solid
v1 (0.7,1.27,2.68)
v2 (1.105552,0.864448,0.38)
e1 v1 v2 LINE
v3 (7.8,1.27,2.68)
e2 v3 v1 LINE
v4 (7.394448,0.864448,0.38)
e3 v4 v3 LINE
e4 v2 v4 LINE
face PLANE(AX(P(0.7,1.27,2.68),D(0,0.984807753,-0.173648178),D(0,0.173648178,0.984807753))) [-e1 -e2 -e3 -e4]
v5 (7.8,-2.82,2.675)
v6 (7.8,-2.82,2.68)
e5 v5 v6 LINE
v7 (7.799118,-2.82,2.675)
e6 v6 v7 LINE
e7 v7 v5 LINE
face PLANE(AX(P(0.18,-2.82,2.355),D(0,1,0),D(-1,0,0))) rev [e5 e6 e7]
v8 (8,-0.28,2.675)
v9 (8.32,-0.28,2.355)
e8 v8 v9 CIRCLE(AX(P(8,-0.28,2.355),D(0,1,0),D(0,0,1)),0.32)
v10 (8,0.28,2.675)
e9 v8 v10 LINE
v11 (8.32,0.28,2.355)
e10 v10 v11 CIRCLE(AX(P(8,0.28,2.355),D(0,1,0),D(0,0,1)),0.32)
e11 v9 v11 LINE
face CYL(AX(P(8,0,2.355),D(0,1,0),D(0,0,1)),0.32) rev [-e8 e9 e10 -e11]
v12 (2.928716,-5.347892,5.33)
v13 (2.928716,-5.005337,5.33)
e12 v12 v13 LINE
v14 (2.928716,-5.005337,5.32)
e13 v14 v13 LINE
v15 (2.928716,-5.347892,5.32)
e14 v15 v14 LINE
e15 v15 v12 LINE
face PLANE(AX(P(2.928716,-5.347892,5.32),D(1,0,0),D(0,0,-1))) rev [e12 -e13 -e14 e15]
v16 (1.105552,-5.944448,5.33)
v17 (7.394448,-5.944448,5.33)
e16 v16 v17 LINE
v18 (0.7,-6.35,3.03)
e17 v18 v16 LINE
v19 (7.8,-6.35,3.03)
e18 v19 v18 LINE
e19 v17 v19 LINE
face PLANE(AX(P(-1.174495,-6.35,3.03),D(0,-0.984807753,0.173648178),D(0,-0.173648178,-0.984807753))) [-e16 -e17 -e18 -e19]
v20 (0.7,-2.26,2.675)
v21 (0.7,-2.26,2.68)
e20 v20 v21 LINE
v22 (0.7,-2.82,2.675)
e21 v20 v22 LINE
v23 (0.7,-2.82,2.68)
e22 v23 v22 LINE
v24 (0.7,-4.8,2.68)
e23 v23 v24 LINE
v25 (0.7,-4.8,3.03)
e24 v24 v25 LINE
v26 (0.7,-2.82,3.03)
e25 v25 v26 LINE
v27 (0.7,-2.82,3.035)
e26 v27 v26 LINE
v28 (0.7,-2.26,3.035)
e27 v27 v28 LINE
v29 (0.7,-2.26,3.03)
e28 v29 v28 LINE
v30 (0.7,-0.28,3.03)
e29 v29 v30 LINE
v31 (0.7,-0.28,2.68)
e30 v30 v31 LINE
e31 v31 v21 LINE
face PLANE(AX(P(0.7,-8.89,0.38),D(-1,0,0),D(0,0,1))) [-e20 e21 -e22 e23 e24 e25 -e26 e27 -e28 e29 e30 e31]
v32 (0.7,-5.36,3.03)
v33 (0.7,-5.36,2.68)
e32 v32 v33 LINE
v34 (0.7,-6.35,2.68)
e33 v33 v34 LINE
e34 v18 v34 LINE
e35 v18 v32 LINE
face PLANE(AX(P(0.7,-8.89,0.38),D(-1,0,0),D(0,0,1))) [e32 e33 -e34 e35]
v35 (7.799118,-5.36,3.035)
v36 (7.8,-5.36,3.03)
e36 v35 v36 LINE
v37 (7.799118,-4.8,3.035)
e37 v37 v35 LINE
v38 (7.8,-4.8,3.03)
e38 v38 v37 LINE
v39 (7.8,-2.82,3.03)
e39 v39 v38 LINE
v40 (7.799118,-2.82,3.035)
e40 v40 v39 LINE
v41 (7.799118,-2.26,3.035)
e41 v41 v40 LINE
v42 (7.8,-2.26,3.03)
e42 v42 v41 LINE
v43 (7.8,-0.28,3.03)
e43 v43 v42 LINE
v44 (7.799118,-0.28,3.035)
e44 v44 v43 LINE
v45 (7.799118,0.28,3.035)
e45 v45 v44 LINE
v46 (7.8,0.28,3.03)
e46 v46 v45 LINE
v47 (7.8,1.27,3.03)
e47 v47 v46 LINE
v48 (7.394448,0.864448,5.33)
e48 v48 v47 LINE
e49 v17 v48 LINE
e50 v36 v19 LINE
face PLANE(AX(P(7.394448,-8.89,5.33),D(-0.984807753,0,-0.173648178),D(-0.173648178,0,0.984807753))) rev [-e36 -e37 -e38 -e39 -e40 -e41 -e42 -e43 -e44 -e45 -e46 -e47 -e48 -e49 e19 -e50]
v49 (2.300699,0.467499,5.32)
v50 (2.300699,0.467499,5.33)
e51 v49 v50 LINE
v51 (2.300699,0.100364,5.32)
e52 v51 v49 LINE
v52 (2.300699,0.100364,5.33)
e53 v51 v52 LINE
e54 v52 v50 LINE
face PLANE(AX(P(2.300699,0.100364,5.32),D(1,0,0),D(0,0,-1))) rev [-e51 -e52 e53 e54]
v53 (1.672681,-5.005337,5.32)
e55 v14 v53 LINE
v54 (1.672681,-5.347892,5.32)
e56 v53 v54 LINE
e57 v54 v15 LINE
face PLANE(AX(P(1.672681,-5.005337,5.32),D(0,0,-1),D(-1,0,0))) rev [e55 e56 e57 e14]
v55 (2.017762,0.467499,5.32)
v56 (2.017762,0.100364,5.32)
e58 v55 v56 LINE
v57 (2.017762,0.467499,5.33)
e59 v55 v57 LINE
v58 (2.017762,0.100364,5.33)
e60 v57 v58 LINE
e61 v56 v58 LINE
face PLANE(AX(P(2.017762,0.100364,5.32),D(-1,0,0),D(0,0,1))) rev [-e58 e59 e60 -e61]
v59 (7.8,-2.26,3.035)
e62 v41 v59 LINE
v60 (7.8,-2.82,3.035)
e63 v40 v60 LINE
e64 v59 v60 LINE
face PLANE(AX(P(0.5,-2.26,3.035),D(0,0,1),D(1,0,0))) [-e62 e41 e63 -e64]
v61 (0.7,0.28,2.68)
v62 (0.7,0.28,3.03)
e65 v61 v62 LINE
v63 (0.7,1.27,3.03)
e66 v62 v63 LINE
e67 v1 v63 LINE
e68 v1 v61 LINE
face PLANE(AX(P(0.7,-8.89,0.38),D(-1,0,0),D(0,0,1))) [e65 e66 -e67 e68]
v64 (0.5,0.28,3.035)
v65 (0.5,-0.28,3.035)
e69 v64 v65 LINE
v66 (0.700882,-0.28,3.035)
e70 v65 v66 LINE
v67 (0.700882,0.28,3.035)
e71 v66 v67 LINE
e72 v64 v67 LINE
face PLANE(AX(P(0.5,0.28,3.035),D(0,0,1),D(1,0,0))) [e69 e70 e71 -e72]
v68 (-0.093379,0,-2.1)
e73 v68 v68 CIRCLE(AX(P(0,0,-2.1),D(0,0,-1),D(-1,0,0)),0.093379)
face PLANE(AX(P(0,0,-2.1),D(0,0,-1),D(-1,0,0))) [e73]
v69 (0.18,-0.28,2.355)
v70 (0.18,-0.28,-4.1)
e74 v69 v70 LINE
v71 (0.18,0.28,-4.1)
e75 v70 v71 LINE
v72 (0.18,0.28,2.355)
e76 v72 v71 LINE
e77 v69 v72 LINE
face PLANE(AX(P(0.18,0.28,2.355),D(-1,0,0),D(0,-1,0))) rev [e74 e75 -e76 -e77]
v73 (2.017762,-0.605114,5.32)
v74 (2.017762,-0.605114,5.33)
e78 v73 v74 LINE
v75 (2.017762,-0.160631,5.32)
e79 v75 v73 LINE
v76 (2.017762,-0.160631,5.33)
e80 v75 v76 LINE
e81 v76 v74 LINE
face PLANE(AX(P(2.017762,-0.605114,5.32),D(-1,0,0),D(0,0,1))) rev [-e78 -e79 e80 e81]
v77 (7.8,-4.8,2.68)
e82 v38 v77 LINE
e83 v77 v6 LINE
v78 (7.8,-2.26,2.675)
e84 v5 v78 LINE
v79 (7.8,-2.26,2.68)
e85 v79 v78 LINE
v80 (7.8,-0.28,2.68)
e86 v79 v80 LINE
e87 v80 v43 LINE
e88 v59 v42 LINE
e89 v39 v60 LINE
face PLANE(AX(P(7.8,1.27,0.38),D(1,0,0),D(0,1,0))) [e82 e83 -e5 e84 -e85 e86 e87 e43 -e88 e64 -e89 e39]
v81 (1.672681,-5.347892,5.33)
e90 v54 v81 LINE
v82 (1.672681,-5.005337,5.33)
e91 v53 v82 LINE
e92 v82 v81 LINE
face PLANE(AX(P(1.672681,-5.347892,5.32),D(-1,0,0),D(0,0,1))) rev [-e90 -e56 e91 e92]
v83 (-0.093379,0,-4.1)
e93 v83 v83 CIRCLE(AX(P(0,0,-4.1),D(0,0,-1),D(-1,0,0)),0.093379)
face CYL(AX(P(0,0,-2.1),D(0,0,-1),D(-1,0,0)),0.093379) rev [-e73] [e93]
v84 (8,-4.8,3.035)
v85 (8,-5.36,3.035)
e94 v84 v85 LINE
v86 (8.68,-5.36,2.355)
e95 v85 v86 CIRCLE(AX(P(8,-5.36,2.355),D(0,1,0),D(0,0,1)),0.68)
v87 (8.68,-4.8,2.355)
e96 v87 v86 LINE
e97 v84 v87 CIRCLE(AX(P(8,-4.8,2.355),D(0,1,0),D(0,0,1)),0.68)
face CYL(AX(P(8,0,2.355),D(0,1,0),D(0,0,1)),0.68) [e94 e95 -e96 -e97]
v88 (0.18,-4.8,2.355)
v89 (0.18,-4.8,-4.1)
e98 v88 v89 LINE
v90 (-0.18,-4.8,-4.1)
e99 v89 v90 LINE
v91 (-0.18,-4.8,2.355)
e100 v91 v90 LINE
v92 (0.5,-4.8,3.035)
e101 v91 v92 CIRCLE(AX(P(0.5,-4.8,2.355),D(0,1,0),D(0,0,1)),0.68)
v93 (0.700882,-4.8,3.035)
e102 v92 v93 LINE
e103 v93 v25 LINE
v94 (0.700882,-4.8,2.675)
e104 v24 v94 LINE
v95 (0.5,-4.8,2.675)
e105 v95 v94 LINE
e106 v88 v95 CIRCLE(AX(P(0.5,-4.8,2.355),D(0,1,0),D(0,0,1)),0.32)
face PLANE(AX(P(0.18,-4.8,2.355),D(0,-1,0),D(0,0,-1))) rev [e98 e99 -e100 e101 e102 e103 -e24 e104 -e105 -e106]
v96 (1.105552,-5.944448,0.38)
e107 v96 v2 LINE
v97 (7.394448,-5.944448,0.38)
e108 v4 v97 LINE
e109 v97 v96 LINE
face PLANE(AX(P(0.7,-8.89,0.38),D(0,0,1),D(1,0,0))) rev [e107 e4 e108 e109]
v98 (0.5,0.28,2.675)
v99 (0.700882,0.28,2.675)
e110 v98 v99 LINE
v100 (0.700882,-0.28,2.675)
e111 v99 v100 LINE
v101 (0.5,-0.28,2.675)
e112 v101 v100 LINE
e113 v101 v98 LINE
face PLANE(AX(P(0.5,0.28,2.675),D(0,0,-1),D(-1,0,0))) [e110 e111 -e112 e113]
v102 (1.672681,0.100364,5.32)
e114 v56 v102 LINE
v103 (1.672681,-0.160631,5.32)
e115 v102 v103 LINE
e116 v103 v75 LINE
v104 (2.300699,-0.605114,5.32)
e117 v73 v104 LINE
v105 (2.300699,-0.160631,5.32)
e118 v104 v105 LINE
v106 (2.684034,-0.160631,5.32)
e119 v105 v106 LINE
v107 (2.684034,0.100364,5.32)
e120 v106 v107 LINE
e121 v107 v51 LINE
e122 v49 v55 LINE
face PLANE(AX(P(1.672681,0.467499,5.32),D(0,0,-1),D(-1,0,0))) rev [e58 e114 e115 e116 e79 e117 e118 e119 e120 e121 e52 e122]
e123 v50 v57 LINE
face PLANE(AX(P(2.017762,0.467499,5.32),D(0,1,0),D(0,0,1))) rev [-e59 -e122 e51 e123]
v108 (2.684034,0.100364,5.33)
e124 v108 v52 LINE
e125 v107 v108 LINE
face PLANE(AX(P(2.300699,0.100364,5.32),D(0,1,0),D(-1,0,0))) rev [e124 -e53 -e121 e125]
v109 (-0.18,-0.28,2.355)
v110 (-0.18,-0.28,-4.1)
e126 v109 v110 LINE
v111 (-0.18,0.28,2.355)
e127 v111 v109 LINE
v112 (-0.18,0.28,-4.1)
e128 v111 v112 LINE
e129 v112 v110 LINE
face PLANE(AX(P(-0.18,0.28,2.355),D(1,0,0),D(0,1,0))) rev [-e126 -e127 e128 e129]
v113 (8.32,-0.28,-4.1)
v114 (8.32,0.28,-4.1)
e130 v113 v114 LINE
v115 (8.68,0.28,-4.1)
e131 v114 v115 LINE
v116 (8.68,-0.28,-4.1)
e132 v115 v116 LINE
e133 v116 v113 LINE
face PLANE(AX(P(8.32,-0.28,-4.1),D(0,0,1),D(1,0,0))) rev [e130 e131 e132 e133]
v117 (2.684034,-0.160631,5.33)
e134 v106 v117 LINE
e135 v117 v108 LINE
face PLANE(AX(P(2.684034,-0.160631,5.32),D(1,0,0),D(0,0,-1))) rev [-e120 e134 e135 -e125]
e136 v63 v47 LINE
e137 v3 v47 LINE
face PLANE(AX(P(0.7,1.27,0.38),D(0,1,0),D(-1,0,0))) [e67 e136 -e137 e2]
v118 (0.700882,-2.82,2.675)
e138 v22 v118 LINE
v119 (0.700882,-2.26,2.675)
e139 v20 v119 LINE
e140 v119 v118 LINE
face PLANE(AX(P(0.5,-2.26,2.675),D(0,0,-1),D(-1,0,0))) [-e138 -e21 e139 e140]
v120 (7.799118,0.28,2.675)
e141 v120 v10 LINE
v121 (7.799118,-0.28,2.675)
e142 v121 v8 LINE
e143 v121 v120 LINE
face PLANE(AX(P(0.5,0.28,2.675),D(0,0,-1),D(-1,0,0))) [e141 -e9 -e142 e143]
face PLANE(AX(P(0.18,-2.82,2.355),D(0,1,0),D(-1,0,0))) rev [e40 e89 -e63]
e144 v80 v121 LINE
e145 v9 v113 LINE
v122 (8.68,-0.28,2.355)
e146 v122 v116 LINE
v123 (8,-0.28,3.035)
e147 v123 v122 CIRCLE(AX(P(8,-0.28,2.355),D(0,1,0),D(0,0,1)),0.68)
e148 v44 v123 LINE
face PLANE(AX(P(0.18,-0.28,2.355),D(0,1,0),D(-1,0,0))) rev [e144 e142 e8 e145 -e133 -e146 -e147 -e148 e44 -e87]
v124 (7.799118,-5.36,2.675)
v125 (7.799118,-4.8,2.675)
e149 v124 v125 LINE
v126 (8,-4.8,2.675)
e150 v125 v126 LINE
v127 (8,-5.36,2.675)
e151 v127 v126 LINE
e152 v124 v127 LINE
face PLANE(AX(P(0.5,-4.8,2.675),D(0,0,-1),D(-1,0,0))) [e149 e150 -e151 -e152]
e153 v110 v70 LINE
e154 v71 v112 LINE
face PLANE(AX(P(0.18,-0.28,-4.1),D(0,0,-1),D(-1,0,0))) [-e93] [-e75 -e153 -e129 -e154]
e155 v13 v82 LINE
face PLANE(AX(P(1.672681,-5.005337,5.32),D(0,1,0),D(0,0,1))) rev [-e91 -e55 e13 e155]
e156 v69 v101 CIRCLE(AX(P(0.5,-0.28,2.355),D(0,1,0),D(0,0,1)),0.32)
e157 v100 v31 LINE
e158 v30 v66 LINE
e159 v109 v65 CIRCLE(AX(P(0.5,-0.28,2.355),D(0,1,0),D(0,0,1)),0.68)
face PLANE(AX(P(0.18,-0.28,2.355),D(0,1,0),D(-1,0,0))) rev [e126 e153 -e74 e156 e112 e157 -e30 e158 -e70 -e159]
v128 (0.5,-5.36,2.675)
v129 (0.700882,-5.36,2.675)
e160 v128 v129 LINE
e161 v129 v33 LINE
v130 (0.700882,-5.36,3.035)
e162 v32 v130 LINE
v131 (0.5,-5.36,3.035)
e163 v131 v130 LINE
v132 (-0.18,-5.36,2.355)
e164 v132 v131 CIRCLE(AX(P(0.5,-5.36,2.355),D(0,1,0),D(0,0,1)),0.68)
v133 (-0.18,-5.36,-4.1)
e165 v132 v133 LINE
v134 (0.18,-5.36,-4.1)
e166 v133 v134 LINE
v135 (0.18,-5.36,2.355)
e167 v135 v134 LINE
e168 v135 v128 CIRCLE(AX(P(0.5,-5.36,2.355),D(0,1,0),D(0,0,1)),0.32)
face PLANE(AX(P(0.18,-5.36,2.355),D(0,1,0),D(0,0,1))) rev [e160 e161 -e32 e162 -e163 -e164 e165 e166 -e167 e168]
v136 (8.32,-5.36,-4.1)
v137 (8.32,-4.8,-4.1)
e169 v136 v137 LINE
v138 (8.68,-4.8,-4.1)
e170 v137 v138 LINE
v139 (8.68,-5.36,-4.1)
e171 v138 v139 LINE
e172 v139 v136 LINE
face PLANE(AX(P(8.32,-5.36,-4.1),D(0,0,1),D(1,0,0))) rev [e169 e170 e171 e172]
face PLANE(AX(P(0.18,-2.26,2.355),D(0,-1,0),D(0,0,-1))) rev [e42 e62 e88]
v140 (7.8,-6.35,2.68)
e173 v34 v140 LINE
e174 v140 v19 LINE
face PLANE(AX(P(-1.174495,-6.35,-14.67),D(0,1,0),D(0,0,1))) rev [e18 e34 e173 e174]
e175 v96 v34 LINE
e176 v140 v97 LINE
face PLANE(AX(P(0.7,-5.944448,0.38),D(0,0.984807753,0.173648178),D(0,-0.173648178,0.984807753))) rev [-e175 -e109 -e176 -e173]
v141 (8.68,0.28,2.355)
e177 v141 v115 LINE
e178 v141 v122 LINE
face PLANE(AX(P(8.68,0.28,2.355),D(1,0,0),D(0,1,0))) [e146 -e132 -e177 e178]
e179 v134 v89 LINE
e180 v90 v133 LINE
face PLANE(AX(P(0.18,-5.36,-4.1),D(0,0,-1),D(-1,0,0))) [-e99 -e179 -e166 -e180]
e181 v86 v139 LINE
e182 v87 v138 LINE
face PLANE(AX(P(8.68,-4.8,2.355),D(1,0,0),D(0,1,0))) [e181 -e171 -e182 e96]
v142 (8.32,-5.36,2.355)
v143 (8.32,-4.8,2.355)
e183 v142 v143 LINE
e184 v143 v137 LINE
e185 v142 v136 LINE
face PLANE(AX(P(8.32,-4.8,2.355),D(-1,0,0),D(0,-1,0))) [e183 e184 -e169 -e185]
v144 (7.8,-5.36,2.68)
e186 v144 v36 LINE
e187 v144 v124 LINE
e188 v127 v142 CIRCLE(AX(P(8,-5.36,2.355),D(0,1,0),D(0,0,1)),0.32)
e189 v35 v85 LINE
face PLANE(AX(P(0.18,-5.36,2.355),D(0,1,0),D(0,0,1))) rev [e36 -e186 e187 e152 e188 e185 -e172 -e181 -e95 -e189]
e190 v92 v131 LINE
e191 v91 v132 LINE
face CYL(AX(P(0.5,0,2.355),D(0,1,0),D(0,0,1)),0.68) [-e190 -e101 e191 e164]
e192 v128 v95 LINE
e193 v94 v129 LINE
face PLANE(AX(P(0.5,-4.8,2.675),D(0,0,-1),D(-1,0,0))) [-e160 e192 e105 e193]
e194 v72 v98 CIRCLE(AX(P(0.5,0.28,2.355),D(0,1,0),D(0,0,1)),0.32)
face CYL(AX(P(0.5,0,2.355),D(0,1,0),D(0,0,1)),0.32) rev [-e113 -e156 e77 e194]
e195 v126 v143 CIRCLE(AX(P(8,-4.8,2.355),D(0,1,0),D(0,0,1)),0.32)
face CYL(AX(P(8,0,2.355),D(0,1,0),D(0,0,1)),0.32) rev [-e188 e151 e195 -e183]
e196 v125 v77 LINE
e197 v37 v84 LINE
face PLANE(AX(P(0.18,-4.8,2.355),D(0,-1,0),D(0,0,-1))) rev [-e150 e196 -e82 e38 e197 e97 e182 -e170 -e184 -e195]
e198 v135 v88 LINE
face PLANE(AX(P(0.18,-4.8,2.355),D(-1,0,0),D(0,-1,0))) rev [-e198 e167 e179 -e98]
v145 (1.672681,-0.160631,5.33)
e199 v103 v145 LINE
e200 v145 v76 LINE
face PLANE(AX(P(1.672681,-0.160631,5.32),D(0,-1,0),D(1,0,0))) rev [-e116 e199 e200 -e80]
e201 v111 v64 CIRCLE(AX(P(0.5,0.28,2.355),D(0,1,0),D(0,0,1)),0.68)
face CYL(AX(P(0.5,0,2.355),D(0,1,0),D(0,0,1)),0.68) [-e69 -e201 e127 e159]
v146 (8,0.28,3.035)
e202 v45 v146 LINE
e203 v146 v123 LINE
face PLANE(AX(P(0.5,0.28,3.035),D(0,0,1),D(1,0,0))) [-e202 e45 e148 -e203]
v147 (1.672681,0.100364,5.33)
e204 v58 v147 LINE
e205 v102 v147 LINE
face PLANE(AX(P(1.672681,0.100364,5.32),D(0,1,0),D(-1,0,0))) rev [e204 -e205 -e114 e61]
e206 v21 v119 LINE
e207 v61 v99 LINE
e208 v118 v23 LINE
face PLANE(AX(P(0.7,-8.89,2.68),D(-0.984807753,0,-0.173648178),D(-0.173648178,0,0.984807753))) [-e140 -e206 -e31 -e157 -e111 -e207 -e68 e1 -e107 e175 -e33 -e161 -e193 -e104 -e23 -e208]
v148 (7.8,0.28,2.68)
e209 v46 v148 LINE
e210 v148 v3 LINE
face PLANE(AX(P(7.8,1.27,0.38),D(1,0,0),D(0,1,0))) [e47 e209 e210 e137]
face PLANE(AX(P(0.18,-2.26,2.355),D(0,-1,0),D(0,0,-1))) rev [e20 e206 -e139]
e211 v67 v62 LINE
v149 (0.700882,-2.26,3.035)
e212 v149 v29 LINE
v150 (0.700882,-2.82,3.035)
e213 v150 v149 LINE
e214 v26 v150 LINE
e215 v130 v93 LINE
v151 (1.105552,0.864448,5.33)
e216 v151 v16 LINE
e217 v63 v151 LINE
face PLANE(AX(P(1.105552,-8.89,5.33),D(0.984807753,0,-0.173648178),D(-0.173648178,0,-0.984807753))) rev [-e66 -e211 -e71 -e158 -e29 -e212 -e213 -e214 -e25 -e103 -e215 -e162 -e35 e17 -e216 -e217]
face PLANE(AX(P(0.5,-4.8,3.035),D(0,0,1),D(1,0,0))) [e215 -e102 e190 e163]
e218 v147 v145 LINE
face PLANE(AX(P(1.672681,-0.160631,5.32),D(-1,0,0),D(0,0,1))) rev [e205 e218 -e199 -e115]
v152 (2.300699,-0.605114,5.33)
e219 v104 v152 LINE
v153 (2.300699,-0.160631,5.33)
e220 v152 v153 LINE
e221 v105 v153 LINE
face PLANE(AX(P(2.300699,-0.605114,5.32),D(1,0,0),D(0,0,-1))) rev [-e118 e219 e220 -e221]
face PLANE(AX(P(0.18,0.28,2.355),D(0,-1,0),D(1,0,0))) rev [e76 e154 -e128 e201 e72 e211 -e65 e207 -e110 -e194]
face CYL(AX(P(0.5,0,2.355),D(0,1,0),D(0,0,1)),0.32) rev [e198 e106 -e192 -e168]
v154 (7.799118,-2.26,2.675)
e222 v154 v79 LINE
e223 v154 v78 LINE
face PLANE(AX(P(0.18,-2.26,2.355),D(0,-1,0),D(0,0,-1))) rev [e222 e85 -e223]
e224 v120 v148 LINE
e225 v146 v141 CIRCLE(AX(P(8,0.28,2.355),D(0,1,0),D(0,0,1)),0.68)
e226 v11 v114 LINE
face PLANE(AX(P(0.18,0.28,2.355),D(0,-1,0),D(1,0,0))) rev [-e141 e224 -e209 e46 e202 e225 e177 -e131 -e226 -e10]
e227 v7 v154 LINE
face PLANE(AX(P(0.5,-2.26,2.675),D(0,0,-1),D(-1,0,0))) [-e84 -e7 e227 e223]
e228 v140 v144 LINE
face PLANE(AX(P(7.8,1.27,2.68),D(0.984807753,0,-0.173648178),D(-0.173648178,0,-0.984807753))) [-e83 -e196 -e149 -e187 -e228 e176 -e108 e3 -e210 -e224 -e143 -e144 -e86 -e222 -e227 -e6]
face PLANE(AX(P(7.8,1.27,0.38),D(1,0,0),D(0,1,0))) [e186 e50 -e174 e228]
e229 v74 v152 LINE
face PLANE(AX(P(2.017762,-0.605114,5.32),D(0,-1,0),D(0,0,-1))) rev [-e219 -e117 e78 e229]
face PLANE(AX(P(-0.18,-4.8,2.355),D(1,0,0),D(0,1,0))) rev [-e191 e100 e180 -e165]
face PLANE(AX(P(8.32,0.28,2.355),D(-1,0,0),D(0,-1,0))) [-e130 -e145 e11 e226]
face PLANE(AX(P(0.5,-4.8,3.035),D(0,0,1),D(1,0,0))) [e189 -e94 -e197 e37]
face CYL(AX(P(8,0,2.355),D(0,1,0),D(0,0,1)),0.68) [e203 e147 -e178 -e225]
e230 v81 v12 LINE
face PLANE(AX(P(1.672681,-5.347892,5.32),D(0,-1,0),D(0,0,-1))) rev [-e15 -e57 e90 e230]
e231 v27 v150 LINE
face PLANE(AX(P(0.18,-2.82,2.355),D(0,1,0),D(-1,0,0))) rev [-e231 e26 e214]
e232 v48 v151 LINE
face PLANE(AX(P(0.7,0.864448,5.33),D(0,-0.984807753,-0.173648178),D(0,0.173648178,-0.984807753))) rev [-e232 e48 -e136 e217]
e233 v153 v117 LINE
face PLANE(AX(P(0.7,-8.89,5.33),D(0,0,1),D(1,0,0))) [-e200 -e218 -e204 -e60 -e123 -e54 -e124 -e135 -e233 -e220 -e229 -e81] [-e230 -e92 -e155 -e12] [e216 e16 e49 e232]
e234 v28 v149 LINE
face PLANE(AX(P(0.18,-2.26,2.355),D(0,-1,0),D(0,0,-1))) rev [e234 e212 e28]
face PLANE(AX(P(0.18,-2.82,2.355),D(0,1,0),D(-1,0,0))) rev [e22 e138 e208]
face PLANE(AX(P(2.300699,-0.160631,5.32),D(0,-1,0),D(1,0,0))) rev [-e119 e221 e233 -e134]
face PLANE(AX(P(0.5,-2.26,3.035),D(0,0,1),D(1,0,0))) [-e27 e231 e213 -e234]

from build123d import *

# Parameters (mm, degrees)
EXTRUDE_1_DEPTH     = 4.95
SKETCH_5_W          = 0.36
SKETCH_5_H          = 0.56
SKETCH_5_2_W        = 0.36
SKETCH_5_2_H        = 0.56
EXTRUDE_2_DEPTH     = 4.1
CHAMFER_1_SIZE      = 2.3
CHAMFER_1_SIZE_2    = 0.405552056
SKETCH_6_W          = 1.256035052
SKETCH_6_H          = 0.342555014
CUT_EXTRUDE_1_DEPTH = 0.01
SKETCH_7_W          = 10.556189846
SKETCH_7_H          = 3.652287582
CUT_EXTRUDE_2_DEPTH = 20
CHAMFER_2_SIZE      = 2.3
CHAMFER_2_SIZE2     = 0.405552056
SKETCH_8_W          = 1.558579466
SKETCH_8_H          = 2.253785059
SKETCH_8_W_2        = 1.350537768
SKETCH_8_H_2        = 2.346248035
CUT_EXTRUDE_3_DEPTH = 20
SKETCH_9_R          = 0.093378716
CUT_EXTRUDE_4_DEPTH = 2


with BuildPart() as part:
    # Эскиз3 → Вытянуть1 (new body)
    with BuildSketch(Plane.XY.offset(5.33)):
        Polygon((0.7, 1.27), (4.25, 1.27), (7.8, 1.27), (7.8, -8.89), (0.7, -8.89), align=None)
    extrude(amount=-EXTRUDE_1_DEPTH)

    # По траектории1: sweep along a path in Эскиз4
    with BuildLine(Plane(origin=(0, 0, 0), x_dir=(1, 0, 0), z_dir=(0, 1, 0))) as sweep_1_path:
        Line((0, 0), (0, -2.355))
        ThreePointArc((0, -2.355), (0.146446609, -2.708553391), (0.5, -2.855))
        Line((0.5, -2.855), (0.7, -2.855))
        Line((0.7, -2.855), (7.8, -2.855))
        Line((7.8, -2.855), (8, -2.855))
        ThreePointArc((8, -2.855), (8.353553391, -2.708553391), (8.5, -2.355))
        Line((8.5, -2.355), (8.5, 0))
        Line((8.5, 0), (8.5, 4.1))
    # Эскиз5 → По траектории1 (sweep)
    with BuildSketch(Plane.XY):
        with Locations((0, -2.54)):
            Rectangle(SKETCH_5_W, SKETCH_5_H)
        Rectangle(SKETCH_5_W, SKETCH_5_H)
        with Locations((0, -5.08)):
            Rectangle(SKETCH_5_W, SKETCH_5_H)
        with Locations((0, -7.62)):
            Rectangle(SKETCH_5_W, SKETCH_5_H)
    sweep(path=sweep_1_path.line)

    # Эскиз5<2> → Вытянуть2 (add)
    with BuildSketch(Plane.XY):
        with Locations((0, -2.54)):
            Rectangle(SKETCH_5_2_W, SKETCH_5_2_H)
        Rectangle(SKETCH_5_2_W, SKETCH_5_2_H)
        with Locations((0, -5.08)):
            Rectangle(SKETCH_5_2_W, SKETCH_5_2_H)
        with Locations((0, -7.62)):
            Rectangle(SKETCH_5_2_W, SKETCH_5_2_H)
    extrude(amount=-EXTRUDE_2_DEPTH)

    # Фаска1
    # the kernel refuses this chamfer: 2.3, 0.405552056 mm, written as the material it takes off along each edge
    with BuildSketch(Plane(origin=(13.776639232, -8.89, 0.38), x_dir=(0, -0.006682531656101655, 0.9999776716360548), z_dir=(-1, 0, 0))) as chamfer_1_piece_1:
        Polygon((CHAMFER_1_SIZE * 0.999977671636, CHAMFER_1_SIZE * 0.0066825316561), (-CHAMFER_1_SIZE_2 * 0.00668253165, CHAMFER_1_SIZE_2 * 0.999977670722), (0, 0), align=None)
    extrude(amount=19.053278464, mode=Mode.SUBTRACT)
    with BuildSketch(Plane(origin=(13.776639232, -8.89, 5.33), x_dir=(4.402885138150507e-15, 0.9776715712462588, 0.2101387607674306), z_dir=(-1, 0, 0))) as chamfer_1_piece_2:
        Polygon((CHAMFER_1_SIZE_2 * 0.977671570353, CHAMFER_1_SIZE_2 * 0.210138760575), (-CHAMFER_1_SIZE * 0.210138760767, CHAMFER_1_SIZE * 0.977671571246), (0, 0), align=None)
    extrude(amount=19.053278464, mode=Mode.SUBTRACT)
    with BuildSketch(Plane(origin=(7.8, 7.246639232, 0.38), x_dir=(0.006682531656101655, 0, 0.9999776716360548), z_dir=(0, -1, 0))) as chamfer_1_piece_3_section:
        Polygon((CHAMFER_1_SIZE * 0.999977671636, CHAMFER_1_SIZE * 0.0066825316561), (-CHAMFER_1_SIZE_2 * 0.00668253165, CHAMFER_1_SIZE_2 * 0.999977670722), (0, 0), align=None)
    chamfer_1_piece_3 = extrude(amount=22.113278464, mode=Mode.PRIVATE)
    chamfer_1_piece_3 = split(chamfer_1_piece_3, bisect_by=Plane(origin=(7.799706122, 0.28, 2.676666667), z_dir=(0, 1, 0)), keep=Keep.TOP, mode=Mode.PRIVATE)
    add(chamfer_1_piece_3, mode=Mode.SUBTRACT)
    with BuildSketch(Plane(origin=(7.8, 7.246639232, 0.38), x_dir=(0.006682531656101655, 0, 0.9999776716360548), z_dir=(0, -1, 0))) as chamfer_1_piece_4_section:
        Polygon((CHAMFER_1_SIZE * 0.999977671636, CHAMFER_1_SIZE * 0.0066825316561), (-CHAMFER_1_SIZE_2 * 0.00668253165, CHAMFER_1_SIZE_2 * 0.999977670722), (0, 0), align=None)
    chamfer_1_piece_4 = extrude(amount=22.113278464, mode=Mode.PRIVATE)
    chamfer_1_piece_4 = split(chamfer_1_piece_4, bisect_by=Plane(origin=(7.664815344, 0, 2.675), z_dir=(0, 0, -1)), keep=Keep.TOP, mode=Mode.PRIVATE)
    add(chamfer_1_piece_4, mode=Mode.SUBTRACT)
    with BuildSketch(Plane(origin=(7.8, 7.246639232, 0.38), x_dir=(0.006682531656101655, 0, 0.9999776716360548), z_dir=(0, -1, 0))) as chamfer_1_piece_5_section:
        Polygon((CHAMFER_1_SIZE * 0.999977671636, CHAMFER_1_SIZE * 0.0066825316561), (-CHAMFER_1_SIZE_2 * 0.00668253165, CHAMFER_1_SIZE_2 * 0.999977670722), (0, 0), align=None)
    chamfer_1_piece_5 = extrude(amount=22.113278464, mode=Mode.PRIVATE)
    chamfer_1_piece_5 = split(chamfer_1_piece_5, bisect_by=Plane(origin=(7.799706122, -2.26, 2.676666667), z_dir=(0, 1, 0)), keep=Keep.TOP, mode=Mode.PRIVATE)
    chamfer_1_piece_5 = split(chamfer_1_piece_5, bisect_by=Plane(origin=(7.799706122, -0.28, 2.676666667), z_dir=(0, -1, 0)), keep=Keep.TOP, mode=Mode.PRIVATE)
    add(chamfer_1_piece_5, mode=Mode.SUBTRACT)
    with BuildSketch(Plane(origin=(7.8, 7.246639232, 0.38), x_dir=(0.006682531656101655, 0, 0.9999776716360548), z_dir=(0, -1, 0))) as chamfer_1_piece_6_section:
        Polygon((CHAMFER_1_SIZE * 0.999977671636, CHAMFER_1_SIZE * 0.0066825316561), (-CHAMFER_1_SIZE_2 * 0.00668253165, CHAMFER_1_SIZE_2 * 0.999977670722), (0, 0), align=None)
    chamfer_1_piece_6 = extrude(amount=22.113278464, mode=Mode.PRIVATE)
    chamfer_1_piece_6 = split(chamfer_1_piece_6, bisect_by=Plane(origin=(7.799706122, -2.82, 2.676666667), z_dir=(0, -1, 0)), keep=Keep.TOP, mode=Mode.PRIVATE)
    chamfer_1_piece_6 = split(chamfer_1_piece_6, bisect_by=Plane(origin=(7.799706122, -4.8, 2.676666667), z_dir=(0, 1, 0)), keep=Keep.TOP, mode=Mode.PRIVATE)
    add(chamfer_1_piece_6, mode=Mode.SUBTRACT)
    with BuildSketch(Plane(origin=(7.8, 7.246639232, 0.38), x_dir=(0.006682531656101655, 0, 0.9999776716360548), z_dir=(0, -1, 0))) as chamfer_1_piece_7_section:
        Polygon((CHAMFER_1_SIZE * 0.999977671636, CHAMFER_1_SIZE * 0.0066825316561), (-CHAMFER_1_SIZE_2 * 0.00668253165, CHAMFER_1_SIZE_2 * 0.999977670722), (0, 0), align=None)
    chamfer_1_piece_7 = extrude(amount=22.113278464, mode=Mode.PRIVATE)
    chamfer_1_piece_7 = split(chamfer_1_piece_7, bisect_by=Plane(origin=(7.799706122, -7.34, 2.676666667), z_dir=(0, 1, 0)), keep=Keep.TOP, mode=Mode.PRIVATE)
    chamfer_1_piece_7 = split(chamfer_1_piece_7, bisect_by=Plane(origin=(7.799706122, -5.36, 2.676666667), z_dir=(0, -1, 0)), keep=Keep.TOP, mode=Mode.PRIVATE)
    add(chamfer_1_piece_7, mode=Mode.SUBTRACT)
    with BuildSketch(Plane(origin=(7.8, 7.246639232, 0.38), x_dir=(0.006682531656101655, 0, 0.9999776716360548), z_dir=(0, -1, 0))) as chamfer_1_piece_8_section:
        Polygon((CHAMFER_1_SIZE * 0.999977671636, CHAMFER_1_SIZE * 0.0066825316561), (-CHAMFER_1_SIZE_2 * 0.00668253165, CHAMFER_1_SIZE_2 * 0.999977670722), (0, 0), align=None)
    chamfer_1_piece_8 = extrude(amount=22.113278464, mode=Mode.PRIVATE)
    chamfer_1_piece_8 = split(chamfer_1_piece_8, bisect_by=Plane(origin=(7.799706122, -7.9, 2.676666667), z_dir=(0, -1, 0)), keep=Keep.TOP, mode=Mode.PRIVATE)
    add(chamfer_1_piece_8, mode=Mode.SUBTRACT)
    with BuildSketch(Plane(origin=(7.8, 7.246639232, 5.33), x_dir=(-0.9776715712462587, -1.3674752616302956e-15, 0.21013876076743102), z_dir=(0, -1, 0))) as chamfer_1_piece_9_section:
        Polygon((CHAMFER_1_SIZE_2 * 0.977671570353, CHAMFER_1_SIZE_2 * 0.210138760575), (-CHAMFER_1_SIZE * 0.210138760767, CHAMFER_1_SIZE * 0.977671571246), (0, 0), align=None)
    chamfer_1_piece_9 = extrude(amount=22.113278464, mode=Mode.PRIVATE)
    chamfer_1_piece_9 = split(chamfer_1_piece_9, bisect_by=Plane(origin=(7.664815344, 0.775, 3.035), z_dir=(0, 0, 1)), keep=Keep.TOP, mode=Mode.PRIVATE)
    add(chamfer_1_piece_9, mode=Mode.SUBTRACT)
    with BuildSketch(Plane(origin=(7.8, 7.246639232, 5.33), x_dir=(-0.9776715712462587, -1.3674752616302956e-15, 0.21013876076743102), z_dir=(0, -1, 0))) as chamfer_1_piece_10_section:
        Polygon((CHAMFER_1_SIZE_2 * 0.977671570353, CHAMFER_1_SIZE_2 * 0.210138760575), (-CHAMFER_1_SIZE * 0.210138760767, CHAMFER_1_SIZE * 0.977671571246), (0, 0), align=None)
    chamfer_1_piece_10 = extrude(amount=22.113278464, mode=Mode.PRIVATE)
    chamfer_1_piece_10 = split(chamfer_1_piece_10, bisect_by=Plane(origin=(7.799706122, 0.28, 3.033333333), z_dir=(0, 1, 0)), keep=Keep.TOP, mode=Mode.PRIVATE)
    add(chamfer_1_piece_10, mode=Mode.SUBTRACT)
    with BuildSketch(Plane(origin=(7.8, 7.246639232, 5.33), x_dir=(-0.9776715712462587, -1.3674752616302956e-15, 0.21013876076743102), z_dir=(0, -1, 0))) as chamfer_1_piece_11_section:
        Polygon((CHAMFER_1_SIZE_2 * 0.977671570353, CHAMFER_1_SIZE_2 * 0.210138760575), (-CHAMFER_1_SIZE * 0.210138760767, CHAMFER_1_SIZE * 0.977671571246), (0, 0), align=None)
    chamfer_1_piece_11 = extrude(amount=22.113278464, mode=Mode.PRIVATE)
    chamfer_1_piece_11 = split(chamfer_1_piece_11, bisect_by=Plane(origin=(7.799706122, -2.26, 3.033333333), z_dir=(0, 1, 0)), keep=Keep.TOP, mode=Mode.PRIVATE)
    chamfer_1_piece_11 = split(chamfer_1_piece_11, bisect_by=Plane(origin=(7.799706122, -0.28, 3.033333333), z_dir=(0, -1, 0)), keep=Keep.TOP, mode=Mode.PRIVATE)
    add(chamfer_1_piece_11, mode=Mode.SUBTRACT)
    with BuildSketch(Plane(origin=(7.8, 7.246639232, 5.33), x_dir=(-0.9776715712462587, -1.3674752616302956e-15, 0.21013876076743102), z_dir=(0, -1, 0))) as chamfer_1_piece_12_section:
        Polygon((CHAMFER_1_SIZE_2 * 0.977671570353, CHAMFER_1_SIZE_2 * 0.210138760575), (-CHAMFER_1_SIZE * 0.210138760767, CHAMFER_1_SIZE * 0.977671571246), (0, 0), align=None)
    chamfer_1_piece_12 = extrude(amount=22.113278464, mode=Mode.PRIVATE)
    chamfer_1_piece_12 = split(chamfer_1_piece_12, bisect_by=Plane(origin=(7.799706122, -2.82, 3.033333333), z_dir=(0, -1, 0)), keep=Keep.TOP, mode=Mode.PRIVATE)
    chamfer_1_piece_12 = split(chamfer_1_piece_12, bisect_by=Plane(origin=(7.799706122, -4.8, 3.033333333), z_dir=(0, 1, 0)), keep=Keep.TOP, mode=Mode.PRIVATE)
    add(chamfer_1_piece_12, mode=Mode.SUBTRACT)
    with BuildSketch(Plane(origin=(7.8, 7.246639232, 5.33), x_dir=(-0.9776715712462587, -1.3674752616302956e-15, 0.21013876076743102), z_dir=(0, -1, 0))) as chamfer_1_piece_13_section:
        Polygon((CHAMFER_1_SIZE_2 * 0.977671570353, CHAMFER_1_SIZE_2 * 0.210138760575), (-CHAMFER_1_SIZE * 0.210138760767, CHAMFER_1_SIZE * 0.977671571246), (0, 0), align=None)
    chamfer_1_piece_13 = extrude(amount=22.113278464, mode=Mode.PRIVATE)
    chamfer_1_piece_13 = split(chamfer_1_piece_13, bisect_by=Plane(origin=(7.799706122, -7.34, 3.033333333), z_dir=(0, 1, 0)), keep=Keep.TOP, mode=Mode.PRIVATE)
    chamfer_1_piece_13 = split(chamfer_1_piece_13, bisect_by=Plane(origin=(7.799706122, -5.36, 3.033333333), z_dir=(0, -1, 0)), keep=Keep.TOP, mode=Mode.PRIVATE)
    add(chamfer_1_piece_13, mode=Mode.SUBTRACT)
    with BuildSketch(Plane(origin=(7.8, 7.246639232, 5.33), x_dir=(-0.9776715712462587, -1.3674752616302956e-15, 0.21013876076743102), z_dir=(0, -1, 0))) as chamfer_1_piece_14_section:
        Polygon((CHAMFER_1_SIZE_2 * 0.977671570353, CHAMFER_1_SIZE_2 * 0.210138760575), (-CHAMFER_1_SIZE * 0.210138760767, CHAMFER_1_SIZE * 0.977671571246), (0, 0), align=None)
    chamfer_1_piece_14 = extrude(amount=22.113278464, mode=Mode.PRIVATE)
    chamfer_1_piece_14 = split(chamfer_1_piece_14, bisect_by=Plane(origin=(7.799706122, -7.9, 3.033333333), z_dir=(0, -1, 0)), keep=Keep.TOP, mode=Mode.PRIVATE)
    add(chamfer_1_piece_14, mode=Mode.SUBTRACT)
    with BuildSketch(Plane(origin=(13.776639232, 1.27, 0.38), x_dir=(0, 0.006682531656101748, 0.9999776716360548), z_dir=(-1, 0, 0)), Plane(origin=(-5.276639232, 1.27, 5.33), x_dir=(0, 0.006682531656101748, -0.9999776716360548), z_dir=(1, 0, 0))) as chamfer_1_piece_15:
        Polygon((CHAMFER_1_SIZE * 0.999977671636, -CHAMFER_1_SIZE * 0.0066825316561), (-CHAMFER_1_SIZE_2 * 0.00668253165, -CHAMFER_1_SIZE_2 * 0.999977670722), (0, 0), align=None)
    extrude(amount=19.053278464, mode=Mode.SUBTRACT)
    with BuildSketch(Plane(origin=(0.7, -14.866639232, 0.38), x_dir=(0.9776715712462587, 0, -0.2101387607674313), z_dir=(0, 1, 0))) as chamfer_1_piece_16_section:
        Polygon((CHAMFER_1_SIZE_2 * 0.977671570353, -CHAMFER_1_SIZE_2 * 0.210138760575), (-CHAMFER_1_SIZE * 0.210138760767, -CHAMFER_1_SIZE * 0.977671571246), (0, 0), align=None)
    chamfer_1_piece_16 = extrude(amount=22.113278464, mode=Mode.PRIVATE)
    chamfer_1_piece_16 = split(chamfer_1_piece_16, bisect_by=Plane(origin=(0.835184656, -8.395, 2.675), z_dir=(0, 0, -1)), keep=Keep.TOP, mode=Mode.PRIVATE)
    add(chamfer_1_piece_16, mode=Mode.SUBTRACT)
    with BuildSketch(Plane(origin=(0.7, -14.866639232, 0.38), x_dir=(0.9776715712462587, 0, -0.2101387607674313), z_dir=(0, 1, 0))) as chamfer_1_piece_17_section:
        Polygon((CHAMFER_1_SIZE_2 * 0.977671570353, -CHAMFER_1_SIZE_2 * 0.210138760575), (-CHAMFER_1_SIZE * 0.210138760767, -CHAMFER_1_SIZE * 0.977671571246), (0, 0), align=None)
    chamfer_1_piece_17 = extrude(amount=22.113278464, mode=Mode.PRIVATE)
    chamfer_1_piece_17 = split(chamfer_1_piece_17, bisect_by=Plane(origin=(0.700293878, -7.9, 2.676666667), z_dir=(0, -1, 0)), keep=Keep.TOP, mode=Mode.PRIVATE)
    add(chamfer_1_piece_17, mode=Mode.SUBTRACT)
    with BuildSketch(Plane(origin=(0.7, -14.866639232, 0.38), x_dir=(0.9776715712462587, 0, -0.2101387607674313), z_dir=(0, 1, 0))) as chamfer_1_piece_18_section:
        Polygon((CHAMFER_1_SIZE_2 * 0.977671570353, -CHAMFER_1_SIZE_2 * 0.210138760575), (-CHAMFER_1_SIZE * 0.210138760767, -CHAMFER_1_SIZE * 0.977671571246), (0, 0), align=None)
    chamfer_1_piece_18 = extrude(amount=22.113278464, mode=Mode.PRIVATE)
    chamfer_1_piece_18 = split(chamfer_1_piece_18, bisect_by=Plane(origin=(0.700293878, -5.36, 2.676666667), z_dir=(0, -1, 0)), keep=Keep.TOP, mode=Mode.PRIVATE)
    chamfer_1_piece_18 = split(chamfer_1_piece_18, bisect_by=Plane(origin=(0.700293878, -7.34, 2.676666667), z_dir=(0, 1, 0)), keep=Keep.TOP, mode=Mode.PRIVATE)
    add(chamfer_1_piece_18, mode=Mode.SUBTRACT)
    with BuildSketch(Plane(origin=(0.7, -14.866639232, 0.38), x_dir=(0.9776715712462587, 0, -0.2101387607674313), z_dir=(0, 1, 0))) as chamfer_1_piece_19_section:
        Polygon((CHAMFER_1_SIZE_2 * 0.977671570353, -CHAMFER_1_SIZE_2 * 0.210138760575), (-CHAMFER_1_SIZE * 0.210138760767, -CHAMFER_1_SIZE * 0.977671571246), (0, 0), align=None)
    chamfer_1_piece_19 = extrude(amount=22.113278464, mode=Mode.PRIVATE)
    chamfer_1_piece_19 = split(chamfer_1_piece_19, bisect_by=Plane(origin=(0.700293878, -2.82, 2.676666667), z_dir=(0, -1, 0)), keep=Keep.TOP, mode=Mode.PRIVATE)
    chamfer_1_piece_19 = split(chamfer_1_piece_19, bisect_by=Plane(origin=(0.700293878, -4.8, 2.676666667), z_dir=(0, 1, 0)), keep=Keep.TOP, mode=Mode.PRIVATE)
    add(chamfer_1_piece_19, mode=Mode.SUBTRACT)
    with BuildSketch(Plane(origin=(0.7, -14.866639232, 0.38), x_dir=(0.9776715712462587, 0, -0.2101387607674313), z_dir=(0, 1, 0))) as chamfer_1_piece_20_section:
        Polygon((CHAMFER_1_SIZE_2 * 0.977671570353, -CHAMFER_1_SIZE_2 * 0.210138760575), (-CHAMFER_1_SIZE * 0.210138760767, -CHAMFER_1_SIZE * 0.977671571246), (0, 0), align=None)
    chamfer_1_piece_20 = extrude(amount=22.113278464, mode=Mode.PRIVATE)
    chamfer_1_piece_20 = split(chamfer_1_piece_20, bisect_by=Plane(origin=(0.700293878, -0.28, 2.676666667), z_dir=(0, -1, 0)), keep=Keep.TOP, mode=Mode.PRIVATE)
    chamfer_1_piece_20 = split(chamfer_1_piece_20, bisect_by=Plane(origin=(0.700293878, -2.26, 2.676666667), z_dir=(0, 1, 0)), keep=Keep.TOP, mode=Mode.PRIVATE)
    add(chamfer_1_piece_20, mode=Mode.SUBTRACT)
    with BuildSketch(Plane(origin=(0.7, -14.866639232, 0.38), x_dir=(0.9776715712462587, 0, -0.2101387607674313), z_dir=(0, 1, 0))) as chamfer_1_piece_21_section:
        Polygon((CHAMFER_1_SIZE_2 * 0.977671570353, -CHAMFER_1_SIZE_2 * 0.210138760575), (-CHAMFER_1_SIZE * 0.210138760767, -CHAMFER_1_SIZE * 0.977671571246), (0, 0), align=None)
    chamfer_1_piece_21 = extrude(amount=22.113278464, mode=Mode.PRIVATE)
    chamfer_1_piece_21 = split(chamfer_1_piece_21, bisect_by=Plane(origin=(0.700293878, 0.28, 2.676666667), z_dir=(0, 1, 0)), keep=Keep.TOP, mode=Mode.PRIVATE)
    add(chamfer_1_piece_21, mode=Mode.SUBTRACT)
    with BuildSketch(Plane(origin=(0.7, -14.866639232, 5.33), x_dir=(0.9776715712462587, 0, 0.2101387607674309), z_dir=(0, 1, 0))) as chamfer_1_piece_22_section:
        Polygon((CHAMFER_1_SIZE_2 * 0.977671570353, CHAMFER_1_SIZE_2 * 0.210138760575), (-CHAMFER_1_SIZE * 0.210138760767, CHAMFER_1_SIZE * 0.977671571246), (0, 0), align=None)
    chamfer_1_piece_22 = extrude(amount=22.113278464, mode=Mode.PRIVATE)
    chamfer_1_piece_22 = split(chamfer_1_piece_22, bisect_by=Plane(origin=(0.835184656, -8.395, 3.035), z_dir=(0, 0, 1)), keep=Keep.TOP, mode=Mode.PRIVATE)
    add(chamfer_1_piece_22, mode=Mode.SUBTRACT)
    with BuildSketch(Plane(origin=(0.7, -14.866639232, 5.33), x_dir=(0.9776715712462587, 0, 0.2101387607674309), z_dir=(0, 1, 0))) as chamfer_1_piece_23_section:
        Polygon((CHAMFER_1_SIZE_2 * 0.977671570353, CHAMFER_1_SIZE_2 * 0.210138760575), (-CHAMFER_1_SIZE * 0.210138760767, CHAMFER_1_SIZE * 0.977671571246), (0, 0), align=None)
    chamfer_1_piece_23 = extrude(amount=22.113278464, mode=Mode.PRIVATE)
    chamfer_1_piece_23 = split(chamfer_1_piece_23, bisect_by=Plane(origin=(0.700293878, -7.9, 3.033333333), z_dir=(0, -1, 0)), keep=Keep.TOP, mode=Mode.PRIVATE)
    add(chamfer_1_piece_23, mode=Mode.SUBTRACT)
    with BuildSketch(Plane(origin=(0.7, -14.866639232, 5.33), x_dir=(0.9776715712462587, 0, 0.2101387607674309), z_dir=(0, 1, 0))) as chamfer_1_piece_24_section:
        Polygon((CHAMFER_1_SIZE_2 * 0.977671570353, CHAMFER_1_SIZE_2 * 0.210138760575), (-CHAMFER_1_SIZE * 0.210138760767, CHAMFER_1_SIZE * 0.977671571246), (0, 0), align=None)
    chamfer_1_piece_24 = extrude(amount=22.113278464, mode=Mode.PRIVATE)
    chamfer_1_piece_24 = split(chamfer_1_piece_24, bisect_by=Plane(origin=(0.700293878, -5.36, 3.033333333), z_dir=(0, -1, 0)), keep=Keep.TOP, mode=Mode.PRIVATE)
    chamfer_1_piece_24 = split(chamfer_1_piece_24, bisect_by=Plane(origin=(0.700293878, -7.34, 3.033333333), z_dir=(0, 1, 0)), keep=Keep.TOP, mode=Mode.PRIVATE)
    add(chamfer_1_piece_24, mode=Mode.SUBTRACT)
    with BuildSketch(Plane(origin=(0.7, -14.866639232, 5.33), x_dir=(0.9776715712462587, 0, 0.2101387607674309), z_dir=(0, 1, 0))) as chamfer_1_piece_25_section:
        Polygon((CHAMFER_1_SIZE_2 * 0.977671570353, CHAMFER_1_SIZE_2 * 0.210138760575), (-CHAMFER_1_SIZE * 0.210138760767, CHAMFER_1_SIZE * 0.977671571246), (0, 0), align=None)
    chamfer_1_piece_25 = extrude(amount=22.113278464, mode=Mode.PRIVATE)
    chamfer_1_piece_25 = split(chamfer_1_piece_25, bisect_by=Plane(origin=(0.700293878, -2.82, 3.033333333), z_dir=(0, -1, 0)), keep=Keep.TOP, mode=Mode.PRIVATE)
    chamfer_1_piece_25 = split(chamfer_1_piece_25, bisect_by=Plane(origin=(0.700293878, -4.8, 3.033333333), z_dir=(0, 1, 0)), keep=Keep.TOP, mode=Mode.PRIVATE)
    add(chamfer_1_piece_25, mode=Mode.SUBTRACT)
    with BuildSketch(Plane(origin=(0.7, -14.866639232, 5.33), x_dir=(0.9776715712462587, 0, 0.2101387607674309), z_dir=(0, 1, 0))) as chamfer_1_piece_26_section:
        Polygon((CHAMFER_1_SIZE_2 * 0.977671570353, CHAMFER_1_SIZE_2 * 0.210138760575), (-CHAMFER_1_SIZE * 0.210138760767, CHAMFER_1_SIZE * 0.977671571246), (0, 0), align=None)
    chamfer_1_piece_26 = extrude(amount=22.113278464, mode=Mode.PRIVATE)
    chamfer_1_piece_26 = split(chamfer_1_piece_26, bisect_by=Plane(origin=(0.700293878, -0.28, 3.033333333), z_dir=(0, -1, 0)), keep=Keep.TOP, mode=Mode.PRIVATE)
    chamfer_1_piece_26 = split(chamfer_1_piece_26, bisect_by=Plane(origin=(0.700293878, -2.26, 3.033333333), z_dir=(0, 1, 0)), keep=Keep.TOP, mode=Mode.PRIVATE)
    add(chamfer_1_piece_26, mode=Mode.SUBTRACT)
    with BuildSketch(Plane(origin=(0.7, -14.866639232, 5.33), x_dir=(0.9776715712462587, 0, 0.2101387607674309), z_dir=(0, 1, 0))) as chamfer_1_piece_27_section:
        Polygon((CHAMFER_1_SIZE_2 * 0.977671570353, CHAMFER_1_SIZE_2 * 0.210138760575), (-CHAMFER_1_SIZE * 0.210138760767, CHAMFER_1_SIZE * 0.977671571246), (0, 0), align=None)
    chamfer_1_piece_27 = extrude(amount=22.113278464, mode=Mode.PRIVATE)
    chamfer_1_piece_27 = split(chamfer_1_piece_27, bisect_by=Plane(origin=(0.700293878, 0.28, 3.033333333), z_dir=(0, 1, 0)), keep=Keep.TOP, mode=Mode.PRIVATE)
    add(chamfer_1_piece_27, mode=Mode.SUBTRACT)

    # Эскиз6 → Вырез-Вытянуть1 (cut)
    with BuildSketch(Plane.XY.offset(5.33)):
        Polygon((2.300698847, 0.100363767), (2.68403422, 0.100363767), (2.68403422, -0.16063053), (2.300698847, -0.16063053), (2.300698847, -0.605114081), (2.017762426, -0.605114081), (2.017762426, -0.16063053), (1.672681321, -0.16063053), (1.672681321, 0.100363767), (2.017762426, 0.100363767), (2.017762426, 0.467499156), (2.300698847, 0.467499156), align=None)
        with Locations((2.300698847, -5.176614669)):
            Rectangle(SKETCH_6_W, SKETCH_6_H)
    extrude(amount=-CUT_EXTRUDE_1_DEPTH, mode=Mode.SUBTRACT)

    # Эскиз7 → Вырез-Вытянуть2 (cut)
    with BuildSketch(Plane.XY.offset(5.33)):
        with Locations((4.103600287, -8.176143791)):
            Rectangle(SKETCH_7_W, SKETCH_7_H)
    extrude(amount=-CUT_EXTRUDE_2_DEPTH, mode=Mode.SUBTRACT)

    # Фаска2
    chamfer_2_edges = [part.edges().sort_by_distance(p)[0] for p in [
        (4.25, -6.35, 0.38),
        (4.25, -6.35, 5.33),
    ]]
    chamfer_2_side = [part.faces().sort_by_distance(p)[0] for p in [
        (4.25, -6.35, 2.855),
    ]]
    chamfer(chamfer_2_edges, length=CHAMFER_2_SIZE, length2=CHAMFER_2_SIZE2, reference=chamfer_2_side[0])

    # Эскиз8 → Вырез-Вытянуть3 (cut)
    with BuildSketch(Plane.XY.offset(5.33)):
        with Locations((8.579289733, -2.470652768)):
            Rectangle(SKETCH_8_W, SKETCH_8_H)
        with Locations((0.024731116, -2.516884255)):
            Rectangle(SKETCH_8_W_2, SKETCH_8_H_2)
    extrude(amount=-CUT_EXTRUDE_3_DEPTH, mode=Mode.SUBTRACT)

    # Эскиз9 → Вырез-Вытянуть4 (cut)
    with BuildSketch(Plane(origin=(0, 0, -4.1), x_dir=(-1, 0, 0), z_dir=(0, 0, -1))):
        Circle(SKETCH_9_R)
    extrude(amount=-CUT_EXTRUDE_4_DEPTH, mode=Mode.SUBTRACT)


solid = part.part
